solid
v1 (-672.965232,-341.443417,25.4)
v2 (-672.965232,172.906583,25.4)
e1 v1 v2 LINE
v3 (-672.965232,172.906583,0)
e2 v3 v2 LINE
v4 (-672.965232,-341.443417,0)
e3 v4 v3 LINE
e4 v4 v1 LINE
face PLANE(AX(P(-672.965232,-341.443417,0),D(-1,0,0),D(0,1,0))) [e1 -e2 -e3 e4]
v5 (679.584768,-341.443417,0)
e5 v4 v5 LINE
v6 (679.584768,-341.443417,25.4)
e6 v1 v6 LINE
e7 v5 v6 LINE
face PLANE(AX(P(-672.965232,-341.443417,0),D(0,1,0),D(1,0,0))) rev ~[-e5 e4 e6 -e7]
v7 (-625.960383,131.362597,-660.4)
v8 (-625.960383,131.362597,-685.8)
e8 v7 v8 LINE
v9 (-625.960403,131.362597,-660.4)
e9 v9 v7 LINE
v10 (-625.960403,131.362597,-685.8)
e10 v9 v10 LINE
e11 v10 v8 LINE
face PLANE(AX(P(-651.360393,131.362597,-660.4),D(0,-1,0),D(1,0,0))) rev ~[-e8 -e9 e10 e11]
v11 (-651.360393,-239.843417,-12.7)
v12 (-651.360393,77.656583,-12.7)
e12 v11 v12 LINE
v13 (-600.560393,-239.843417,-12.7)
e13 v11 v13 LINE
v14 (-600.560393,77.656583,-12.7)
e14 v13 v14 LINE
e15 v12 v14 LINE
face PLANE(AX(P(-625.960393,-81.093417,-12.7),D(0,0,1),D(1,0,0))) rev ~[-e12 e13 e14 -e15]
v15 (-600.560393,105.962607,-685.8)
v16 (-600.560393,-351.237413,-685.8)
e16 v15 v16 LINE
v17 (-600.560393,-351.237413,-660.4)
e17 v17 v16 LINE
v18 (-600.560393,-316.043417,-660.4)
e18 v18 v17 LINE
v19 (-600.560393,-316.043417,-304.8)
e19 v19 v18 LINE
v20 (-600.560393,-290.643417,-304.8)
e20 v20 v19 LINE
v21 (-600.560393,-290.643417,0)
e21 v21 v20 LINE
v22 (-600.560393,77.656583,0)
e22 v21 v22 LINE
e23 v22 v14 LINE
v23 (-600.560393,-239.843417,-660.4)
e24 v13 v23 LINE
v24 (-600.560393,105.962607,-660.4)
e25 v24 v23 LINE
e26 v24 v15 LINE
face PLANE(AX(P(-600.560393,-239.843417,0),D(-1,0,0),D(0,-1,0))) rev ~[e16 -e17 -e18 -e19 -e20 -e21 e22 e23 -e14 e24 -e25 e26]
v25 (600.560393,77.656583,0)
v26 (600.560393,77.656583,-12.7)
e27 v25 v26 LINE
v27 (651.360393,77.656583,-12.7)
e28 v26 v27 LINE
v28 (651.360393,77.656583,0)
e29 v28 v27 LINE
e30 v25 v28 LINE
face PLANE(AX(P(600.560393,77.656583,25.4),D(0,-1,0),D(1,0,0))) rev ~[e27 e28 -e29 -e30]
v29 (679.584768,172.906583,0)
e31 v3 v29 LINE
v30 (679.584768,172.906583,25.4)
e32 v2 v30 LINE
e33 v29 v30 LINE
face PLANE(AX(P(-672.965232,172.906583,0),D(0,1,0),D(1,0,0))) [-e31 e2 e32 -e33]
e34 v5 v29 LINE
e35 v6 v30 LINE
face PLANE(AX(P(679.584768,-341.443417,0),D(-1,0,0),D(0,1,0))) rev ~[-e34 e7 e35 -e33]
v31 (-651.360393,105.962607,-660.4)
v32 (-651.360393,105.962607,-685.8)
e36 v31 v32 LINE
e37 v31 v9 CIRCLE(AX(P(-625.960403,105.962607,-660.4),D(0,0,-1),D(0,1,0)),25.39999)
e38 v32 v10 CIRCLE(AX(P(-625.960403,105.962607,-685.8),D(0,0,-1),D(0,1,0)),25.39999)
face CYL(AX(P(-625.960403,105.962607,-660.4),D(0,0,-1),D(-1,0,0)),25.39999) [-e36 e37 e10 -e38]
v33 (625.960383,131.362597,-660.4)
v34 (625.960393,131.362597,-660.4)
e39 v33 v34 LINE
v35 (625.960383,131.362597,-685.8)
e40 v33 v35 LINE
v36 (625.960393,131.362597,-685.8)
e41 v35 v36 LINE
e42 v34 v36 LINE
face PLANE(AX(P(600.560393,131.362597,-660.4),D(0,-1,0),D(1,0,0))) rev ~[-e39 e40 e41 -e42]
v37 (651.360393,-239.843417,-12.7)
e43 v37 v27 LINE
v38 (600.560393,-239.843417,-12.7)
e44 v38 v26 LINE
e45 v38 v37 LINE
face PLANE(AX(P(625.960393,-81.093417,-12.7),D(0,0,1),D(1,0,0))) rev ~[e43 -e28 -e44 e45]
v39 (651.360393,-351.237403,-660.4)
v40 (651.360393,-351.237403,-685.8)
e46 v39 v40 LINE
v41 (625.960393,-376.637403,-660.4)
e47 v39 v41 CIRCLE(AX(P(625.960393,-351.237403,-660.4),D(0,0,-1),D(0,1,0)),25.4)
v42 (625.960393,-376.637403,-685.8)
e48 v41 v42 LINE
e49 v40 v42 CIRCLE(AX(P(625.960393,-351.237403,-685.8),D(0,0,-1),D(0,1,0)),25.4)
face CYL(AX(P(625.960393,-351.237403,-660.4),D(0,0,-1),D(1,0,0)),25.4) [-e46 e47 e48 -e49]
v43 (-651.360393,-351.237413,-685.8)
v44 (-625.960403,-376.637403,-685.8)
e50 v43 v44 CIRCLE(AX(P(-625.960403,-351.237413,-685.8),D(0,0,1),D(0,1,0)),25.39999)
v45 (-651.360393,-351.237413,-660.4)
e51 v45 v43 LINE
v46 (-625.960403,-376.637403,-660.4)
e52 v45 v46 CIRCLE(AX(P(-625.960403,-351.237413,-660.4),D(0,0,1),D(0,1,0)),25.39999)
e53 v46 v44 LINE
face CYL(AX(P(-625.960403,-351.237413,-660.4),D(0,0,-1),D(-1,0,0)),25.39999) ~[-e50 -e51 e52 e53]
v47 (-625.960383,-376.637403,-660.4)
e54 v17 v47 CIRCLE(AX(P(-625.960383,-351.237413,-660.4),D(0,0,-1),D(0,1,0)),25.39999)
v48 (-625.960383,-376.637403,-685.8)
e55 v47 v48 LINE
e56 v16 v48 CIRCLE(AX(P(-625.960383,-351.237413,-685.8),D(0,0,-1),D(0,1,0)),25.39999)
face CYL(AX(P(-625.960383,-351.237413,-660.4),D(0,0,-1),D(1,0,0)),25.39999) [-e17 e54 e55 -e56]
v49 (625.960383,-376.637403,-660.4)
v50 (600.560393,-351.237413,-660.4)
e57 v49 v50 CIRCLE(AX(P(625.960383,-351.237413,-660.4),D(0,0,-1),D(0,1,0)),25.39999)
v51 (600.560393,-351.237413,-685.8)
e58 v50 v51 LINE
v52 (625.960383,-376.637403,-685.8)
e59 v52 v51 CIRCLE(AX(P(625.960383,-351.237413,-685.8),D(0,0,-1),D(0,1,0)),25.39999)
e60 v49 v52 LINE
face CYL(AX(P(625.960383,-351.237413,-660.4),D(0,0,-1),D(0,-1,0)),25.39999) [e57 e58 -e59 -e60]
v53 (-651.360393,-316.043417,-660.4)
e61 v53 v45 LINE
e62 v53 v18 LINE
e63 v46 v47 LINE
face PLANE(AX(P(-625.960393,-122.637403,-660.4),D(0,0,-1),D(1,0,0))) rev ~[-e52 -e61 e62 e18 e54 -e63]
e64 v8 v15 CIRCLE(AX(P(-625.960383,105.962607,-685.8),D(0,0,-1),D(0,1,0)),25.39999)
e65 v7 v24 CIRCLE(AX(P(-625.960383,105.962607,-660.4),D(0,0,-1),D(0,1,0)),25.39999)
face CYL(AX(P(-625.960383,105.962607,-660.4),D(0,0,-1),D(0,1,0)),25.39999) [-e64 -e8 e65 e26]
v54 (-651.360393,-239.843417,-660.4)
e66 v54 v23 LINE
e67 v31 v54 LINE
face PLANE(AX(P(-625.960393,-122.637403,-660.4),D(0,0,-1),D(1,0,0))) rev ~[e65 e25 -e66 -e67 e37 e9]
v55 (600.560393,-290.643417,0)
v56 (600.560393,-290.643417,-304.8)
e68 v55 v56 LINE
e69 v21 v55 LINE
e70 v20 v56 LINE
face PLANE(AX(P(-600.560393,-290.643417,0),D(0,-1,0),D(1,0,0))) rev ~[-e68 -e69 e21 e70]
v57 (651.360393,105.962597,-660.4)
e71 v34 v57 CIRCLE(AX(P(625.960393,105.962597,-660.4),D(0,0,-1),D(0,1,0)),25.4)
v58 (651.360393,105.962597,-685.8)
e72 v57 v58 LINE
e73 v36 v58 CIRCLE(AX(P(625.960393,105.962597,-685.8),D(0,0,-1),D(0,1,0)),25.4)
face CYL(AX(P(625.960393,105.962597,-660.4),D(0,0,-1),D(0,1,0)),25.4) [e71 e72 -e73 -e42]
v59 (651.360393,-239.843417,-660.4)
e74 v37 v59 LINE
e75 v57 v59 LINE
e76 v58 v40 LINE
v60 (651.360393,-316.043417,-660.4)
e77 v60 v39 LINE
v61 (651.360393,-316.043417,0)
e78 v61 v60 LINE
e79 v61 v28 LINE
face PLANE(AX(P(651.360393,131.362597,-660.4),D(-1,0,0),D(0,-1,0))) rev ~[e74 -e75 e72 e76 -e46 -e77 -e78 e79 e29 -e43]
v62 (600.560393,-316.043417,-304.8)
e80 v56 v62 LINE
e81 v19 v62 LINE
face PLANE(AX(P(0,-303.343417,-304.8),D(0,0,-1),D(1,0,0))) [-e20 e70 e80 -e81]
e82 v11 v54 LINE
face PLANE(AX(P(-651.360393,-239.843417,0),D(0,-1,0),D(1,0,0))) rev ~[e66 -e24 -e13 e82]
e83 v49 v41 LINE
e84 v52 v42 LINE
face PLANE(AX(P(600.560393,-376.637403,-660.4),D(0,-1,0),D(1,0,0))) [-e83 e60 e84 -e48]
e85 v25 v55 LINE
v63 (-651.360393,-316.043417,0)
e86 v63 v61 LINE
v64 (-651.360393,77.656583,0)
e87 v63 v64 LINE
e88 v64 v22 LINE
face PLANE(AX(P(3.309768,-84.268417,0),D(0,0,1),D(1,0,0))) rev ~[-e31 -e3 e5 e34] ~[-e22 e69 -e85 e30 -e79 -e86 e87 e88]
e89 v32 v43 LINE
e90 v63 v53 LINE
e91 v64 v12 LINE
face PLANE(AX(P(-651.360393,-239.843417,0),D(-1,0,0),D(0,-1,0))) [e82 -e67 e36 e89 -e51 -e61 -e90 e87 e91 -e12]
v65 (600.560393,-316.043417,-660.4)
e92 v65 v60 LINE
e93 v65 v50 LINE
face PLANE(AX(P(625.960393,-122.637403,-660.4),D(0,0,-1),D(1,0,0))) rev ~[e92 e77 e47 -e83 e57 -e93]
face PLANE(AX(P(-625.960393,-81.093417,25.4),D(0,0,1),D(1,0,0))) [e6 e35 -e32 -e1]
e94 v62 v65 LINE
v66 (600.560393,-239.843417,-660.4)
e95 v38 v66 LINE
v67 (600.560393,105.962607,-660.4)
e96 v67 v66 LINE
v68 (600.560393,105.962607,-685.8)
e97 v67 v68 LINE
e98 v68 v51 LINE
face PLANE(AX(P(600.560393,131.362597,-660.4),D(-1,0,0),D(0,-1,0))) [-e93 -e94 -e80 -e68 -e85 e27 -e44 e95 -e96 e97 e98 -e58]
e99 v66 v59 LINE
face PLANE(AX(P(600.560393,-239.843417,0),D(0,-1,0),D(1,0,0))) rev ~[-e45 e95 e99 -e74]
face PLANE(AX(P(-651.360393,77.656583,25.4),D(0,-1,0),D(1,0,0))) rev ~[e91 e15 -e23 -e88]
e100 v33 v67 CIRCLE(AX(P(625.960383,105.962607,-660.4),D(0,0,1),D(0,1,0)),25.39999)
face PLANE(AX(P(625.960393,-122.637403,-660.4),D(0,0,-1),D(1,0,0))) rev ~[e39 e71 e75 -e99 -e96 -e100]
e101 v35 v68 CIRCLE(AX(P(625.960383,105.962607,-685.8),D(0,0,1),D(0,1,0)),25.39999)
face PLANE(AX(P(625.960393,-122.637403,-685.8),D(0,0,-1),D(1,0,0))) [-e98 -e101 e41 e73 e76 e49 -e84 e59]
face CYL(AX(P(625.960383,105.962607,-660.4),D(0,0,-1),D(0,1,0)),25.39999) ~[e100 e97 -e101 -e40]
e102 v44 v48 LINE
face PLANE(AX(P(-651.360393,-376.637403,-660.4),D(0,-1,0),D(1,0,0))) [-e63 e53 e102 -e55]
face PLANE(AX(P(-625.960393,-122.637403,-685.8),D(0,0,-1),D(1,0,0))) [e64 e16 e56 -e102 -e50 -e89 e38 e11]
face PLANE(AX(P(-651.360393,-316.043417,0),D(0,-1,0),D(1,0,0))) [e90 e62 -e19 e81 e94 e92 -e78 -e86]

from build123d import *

# Parameters (mm, degrees)
F0_W      = 1352.55
F0_H      = 514.35
F1_DEPTH  = 25.4
F2_W      = 50.8
F2_H      = 317.5
F3_DEPTH  = 38.1
F4_W      = 50.8
F4_H      = 76.2
F5_DEPTH  = 660.4
F6_W      = 50.8
F6_H      = 508
F7_DEPTH  = 25.4
F8_R      = 25.4
F9_R      = 25.39999
F10_R     = 25.4
F11_R     = 25.39999
F12_R     = 25.39999
F13_R     = 25.39999
F14_W     = 1201.120785141
F14_H     = 25.4
F15_DEPTH = 304.8


# Not quite as in the source:
# - a fillet or chamfer is up to 0.001 mm smaller than in the source, because OpenCascade refuses the exact size


with BuildPart() as f1:
    # F0 (on Top) → F1 (new body)
    with BuildSketch(Plane.XY):
        with Locations((3.3097676933, -84.2684167102)):
            Rectangle(F0_W, F0_H)
    extrude(amount=F1_DEPTH)

    # F2 (on face) → F3 (join)
    with BuildSketch(Plane.XY.offset(25.4)):
        with Locations((-625.9603925705, -81.0934167102)):
            Rectangle(F2_W, F2_H)
        with Locations((625.9603925705, -81.0934167102)):
            Rectangle(F2_W, F2_H)
    extrude(amount=-F3_DEPTH)

    # F4 (on face) → F5 (join)
    with BuildSketch(Plane(origin=(0, 0, 0), x_dir=(1, 0, 0), z_dir=(0, 0, -1))):
        with Locations((-625.9603925705, 277.9434167102)):
            Rectangle(F4_W, F4_H)
        with Locations((625.9603925705, 277.9434167102)):
            Rectangle(F4_W, F4_H)
    extrude(amount=F5_DEPTH)

    # F6 (on face) → F7 (join)
    with BuildSketch(Plane(origin=(0, 0, -660.4), x_dir=(1, 0, 0), z_dir=(0, 0, -1))):
        with Locations((625.9603925705, 122.6374032485)):
            Rectangle(F6_W, F6_H)
        with Locations((-625.9603925705, 122.6374032485)):
            Rectangle(F6_W, F6_H)
    extrude(amount=F7_DEPTH)

    # F8
    f8_edges = [f1.edges().sort_by_distance(p)[0] for p in [
        (651.360393, 131.362597, -673.1),
    ]]
    fillet(f8_edges, radius=F8_R)

    # F9 (radius 25.4 in the source; OpenCascade refuses exactly that, so slightly less here)
    f9_edges = [f1.edges().sort_by_distance(p)[0] for p in [
        (600.560393, 131.362597, -673.1),
    ]]
    fillet(f9_edges, radius=F9_R)

    # F10
    f10_edges = [f1.edges().sort_by_distance(p)[0] for p in [
        (651.360393, -376.637403, -673.1),
    ]]
    fillet(f10_edges, radius=F10_R)

    # F11 (radius 25.4 in the source; OpenCascade refuses exactly that, so slightly less here)
    f11_edges = [f1.edges().sort_by_distance(p)[0] for p in [
        (600.560393, -376.637403, -673.1),
    ]]
    fillet(f11_edges, radius=F11_R)

    # F12 (radius 25.4 in the source; OpenCascade refuses exactly that, so slightly less here)
    f12_edges = [f1.edges().sort_by_distance(p)[0] for p in [
        (-600.560393, -376.637403, -673.1),
        (-651.360393, -376.637403, -673.1),
    ]]
    fillet(f12_edges, radius=F12_R)

    # F13 (radius 25.4 in the source; OpenCascade refuses exactly that, so slightly less here)
    f13_edges = [f1.edges().sort_by_distance(p)[0] for p in [
        (-651.360393, 131.362597, -673.1),
        (-600.560393, 131.362597, -673.1),
    ]]
    fillet(f13_edges, radius=F13_R)

    # F14 (on face) → F15 (join)
    with BuildSketch(Plane(origin=(0, 0, 0), x_dir=(1, 0, 0), z_dir=(0, 0, -1))):
        with Locations((0, 303.3434167102)):
            Rectangle(F14_W, F14_H)
    extrude(amount=F15_DEPTH)


solid = f1.part
